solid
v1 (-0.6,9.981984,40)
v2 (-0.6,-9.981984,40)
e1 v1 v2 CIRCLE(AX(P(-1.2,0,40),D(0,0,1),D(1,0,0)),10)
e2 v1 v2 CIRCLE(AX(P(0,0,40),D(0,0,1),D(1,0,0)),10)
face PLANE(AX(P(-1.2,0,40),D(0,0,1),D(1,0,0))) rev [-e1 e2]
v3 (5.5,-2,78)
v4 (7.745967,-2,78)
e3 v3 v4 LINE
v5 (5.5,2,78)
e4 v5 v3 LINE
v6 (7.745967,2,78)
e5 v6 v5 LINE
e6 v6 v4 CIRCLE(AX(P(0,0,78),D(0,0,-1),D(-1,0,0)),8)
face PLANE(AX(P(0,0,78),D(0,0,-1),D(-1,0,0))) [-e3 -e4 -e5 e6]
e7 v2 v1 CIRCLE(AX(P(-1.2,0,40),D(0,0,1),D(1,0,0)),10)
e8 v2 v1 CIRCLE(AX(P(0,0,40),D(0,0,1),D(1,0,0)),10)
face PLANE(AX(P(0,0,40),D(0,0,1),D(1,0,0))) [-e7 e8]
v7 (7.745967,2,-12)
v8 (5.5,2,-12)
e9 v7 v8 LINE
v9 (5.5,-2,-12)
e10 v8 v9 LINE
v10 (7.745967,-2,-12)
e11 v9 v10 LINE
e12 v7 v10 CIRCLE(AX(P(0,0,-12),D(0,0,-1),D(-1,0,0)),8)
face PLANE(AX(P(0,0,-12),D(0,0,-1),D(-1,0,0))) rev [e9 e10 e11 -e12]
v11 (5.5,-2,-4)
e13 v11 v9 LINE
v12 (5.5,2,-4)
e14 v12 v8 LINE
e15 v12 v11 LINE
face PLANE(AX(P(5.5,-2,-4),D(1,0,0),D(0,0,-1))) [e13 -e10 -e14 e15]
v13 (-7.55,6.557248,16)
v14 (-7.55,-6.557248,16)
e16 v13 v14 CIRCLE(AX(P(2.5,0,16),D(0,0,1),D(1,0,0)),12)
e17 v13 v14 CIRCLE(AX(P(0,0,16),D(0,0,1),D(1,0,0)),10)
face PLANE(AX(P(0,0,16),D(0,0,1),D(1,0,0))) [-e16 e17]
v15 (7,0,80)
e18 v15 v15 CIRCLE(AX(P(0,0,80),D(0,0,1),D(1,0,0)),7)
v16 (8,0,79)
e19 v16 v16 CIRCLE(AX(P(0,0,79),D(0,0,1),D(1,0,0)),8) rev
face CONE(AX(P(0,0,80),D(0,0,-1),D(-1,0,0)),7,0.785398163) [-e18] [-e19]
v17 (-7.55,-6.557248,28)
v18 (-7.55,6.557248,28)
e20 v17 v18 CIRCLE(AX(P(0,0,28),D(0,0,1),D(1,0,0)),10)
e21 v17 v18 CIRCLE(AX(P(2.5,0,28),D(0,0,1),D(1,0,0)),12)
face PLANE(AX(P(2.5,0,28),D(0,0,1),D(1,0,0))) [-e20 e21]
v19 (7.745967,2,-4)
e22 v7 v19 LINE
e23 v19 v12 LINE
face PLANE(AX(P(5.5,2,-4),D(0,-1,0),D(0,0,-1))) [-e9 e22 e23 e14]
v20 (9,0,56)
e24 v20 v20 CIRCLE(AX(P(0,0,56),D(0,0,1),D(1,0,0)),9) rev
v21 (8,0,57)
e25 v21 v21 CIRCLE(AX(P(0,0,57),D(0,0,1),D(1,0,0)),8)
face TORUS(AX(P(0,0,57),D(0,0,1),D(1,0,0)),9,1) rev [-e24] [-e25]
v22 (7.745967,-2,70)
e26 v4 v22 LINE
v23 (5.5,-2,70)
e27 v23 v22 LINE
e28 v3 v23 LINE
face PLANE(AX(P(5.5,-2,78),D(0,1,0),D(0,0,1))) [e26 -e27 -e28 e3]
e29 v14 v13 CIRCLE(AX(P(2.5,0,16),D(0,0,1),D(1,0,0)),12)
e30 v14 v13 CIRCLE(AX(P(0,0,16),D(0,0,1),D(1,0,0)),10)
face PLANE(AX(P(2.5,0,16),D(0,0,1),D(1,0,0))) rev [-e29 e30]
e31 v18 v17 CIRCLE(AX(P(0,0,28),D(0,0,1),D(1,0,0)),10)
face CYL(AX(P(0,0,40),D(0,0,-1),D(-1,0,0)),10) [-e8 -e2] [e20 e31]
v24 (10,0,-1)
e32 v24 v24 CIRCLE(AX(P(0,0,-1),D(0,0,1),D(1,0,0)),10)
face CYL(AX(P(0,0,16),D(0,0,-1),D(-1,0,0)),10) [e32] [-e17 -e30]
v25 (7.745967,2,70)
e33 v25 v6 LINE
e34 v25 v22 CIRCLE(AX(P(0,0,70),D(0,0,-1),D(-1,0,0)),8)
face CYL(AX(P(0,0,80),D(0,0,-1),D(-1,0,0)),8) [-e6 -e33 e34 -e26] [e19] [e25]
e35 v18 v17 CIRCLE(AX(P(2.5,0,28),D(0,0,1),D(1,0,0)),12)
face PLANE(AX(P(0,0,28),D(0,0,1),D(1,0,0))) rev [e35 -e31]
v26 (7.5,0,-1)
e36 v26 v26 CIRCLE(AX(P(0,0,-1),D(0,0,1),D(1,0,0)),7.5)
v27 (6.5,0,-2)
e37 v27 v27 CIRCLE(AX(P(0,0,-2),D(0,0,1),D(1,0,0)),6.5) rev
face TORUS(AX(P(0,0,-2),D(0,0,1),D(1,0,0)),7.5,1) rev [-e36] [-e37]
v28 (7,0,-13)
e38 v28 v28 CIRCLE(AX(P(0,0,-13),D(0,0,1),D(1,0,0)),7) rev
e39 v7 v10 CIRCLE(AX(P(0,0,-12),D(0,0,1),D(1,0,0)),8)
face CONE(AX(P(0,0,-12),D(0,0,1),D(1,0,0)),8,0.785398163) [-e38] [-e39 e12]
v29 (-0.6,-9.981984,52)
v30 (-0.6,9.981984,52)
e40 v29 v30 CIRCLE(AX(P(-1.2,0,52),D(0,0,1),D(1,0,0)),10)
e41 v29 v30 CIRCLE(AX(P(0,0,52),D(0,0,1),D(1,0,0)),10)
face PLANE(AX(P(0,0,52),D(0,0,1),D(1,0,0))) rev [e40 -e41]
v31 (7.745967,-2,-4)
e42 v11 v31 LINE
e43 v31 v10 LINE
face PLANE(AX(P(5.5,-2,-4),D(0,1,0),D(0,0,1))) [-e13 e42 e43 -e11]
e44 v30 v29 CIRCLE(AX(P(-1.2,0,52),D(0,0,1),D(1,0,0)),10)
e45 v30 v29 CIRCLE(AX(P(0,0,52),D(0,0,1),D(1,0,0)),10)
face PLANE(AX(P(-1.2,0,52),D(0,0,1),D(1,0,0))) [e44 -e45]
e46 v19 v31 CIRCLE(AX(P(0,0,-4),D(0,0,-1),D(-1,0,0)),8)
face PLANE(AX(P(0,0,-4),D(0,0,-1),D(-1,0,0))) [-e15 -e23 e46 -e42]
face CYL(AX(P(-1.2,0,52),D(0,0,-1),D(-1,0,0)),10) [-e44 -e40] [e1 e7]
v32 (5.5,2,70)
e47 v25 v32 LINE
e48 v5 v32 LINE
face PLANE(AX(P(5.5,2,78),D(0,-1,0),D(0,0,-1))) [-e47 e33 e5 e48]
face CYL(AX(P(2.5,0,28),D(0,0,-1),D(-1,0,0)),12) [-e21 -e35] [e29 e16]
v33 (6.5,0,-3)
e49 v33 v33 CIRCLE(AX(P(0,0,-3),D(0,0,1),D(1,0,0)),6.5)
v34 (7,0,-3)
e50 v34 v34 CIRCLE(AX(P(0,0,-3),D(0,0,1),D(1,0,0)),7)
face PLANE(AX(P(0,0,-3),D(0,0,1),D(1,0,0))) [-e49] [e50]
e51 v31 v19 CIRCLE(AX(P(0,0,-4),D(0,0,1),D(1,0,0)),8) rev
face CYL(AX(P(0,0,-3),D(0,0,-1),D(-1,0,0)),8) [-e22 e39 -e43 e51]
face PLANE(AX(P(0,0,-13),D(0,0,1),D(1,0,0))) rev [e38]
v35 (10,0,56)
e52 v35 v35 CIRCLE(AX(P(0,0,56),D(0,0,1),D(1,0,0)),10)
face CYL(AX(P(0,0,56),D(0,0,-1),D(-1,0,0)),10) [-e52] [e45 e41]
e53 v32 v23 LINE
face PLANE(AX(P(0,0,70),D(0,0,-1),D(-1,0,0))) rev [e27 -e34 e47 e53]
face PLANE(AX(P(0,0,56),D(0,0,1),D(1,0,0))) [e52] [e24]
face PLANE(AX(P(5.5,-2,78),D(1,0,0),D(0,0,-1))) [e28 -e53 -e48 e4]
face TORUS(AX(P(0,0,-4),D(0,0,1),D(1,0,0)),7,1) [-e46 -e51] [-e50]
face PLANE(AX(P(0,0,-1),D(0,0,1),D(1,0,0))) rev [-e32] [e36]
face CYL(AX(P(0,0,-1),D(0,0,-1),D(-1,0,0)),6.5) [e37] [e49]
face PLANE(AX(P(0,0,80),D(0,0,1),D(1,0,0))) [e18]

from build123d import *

# Parameters (mm, degrees)
SKETCH_1_R          = 8
EXTRUDE_1_DEPTH     = 10
SKETCH_2_R          = 6.5
EXTRUDE_2_DEPTH     = 2
SKETCH_3_R          = 10
EXTRUDE_3_DEPTH     = 17
SKETCH_4_R          = 12
EXTRUDE_4_DEPTH     = 12
SKETCH_5_R          = 10
EXTRUDE_5_DEPTH     = 12
SKETCH_6_R          = 10
EXTRUDE_6_DEPTH     = 12
SKETCH_7_R          = 10
EXTRUDE_7_DEPTH     = 4
SKETCH_8_R          = 8
EXTRUDE_8_DEPTH     = 24
SKETCH_9_W          = 5.5
SKETCH_9_H          = 4
CUT_EXTRUDE_1_DEPTH = 8
SKETCH_10_W         = 5.5
SKETCH_10_H         = 4
CUT_EXTRUDE_2_DEPTH = 8
CHAMFER_1_SIZE      = 1
FILLET_1_R          = 1


with BuildPart() as part:
    # 草图1 → 凸台-拉伸1 (new body)
    with BuildSketch(Plane.XY.offset(-13)):
        Circle(SKETCH_1_R)
    extrude(amount=EXTRUDE_1_DEPTH)

    # 草图2 → 凸台-拉伸2 (add)
    with BuildSketch(Plane.XY.offset(-3)):
        Circle(SKETCH_2_R)
    extrude(amount=EXTRUDE_2_DEPTH)

    # 草图3 → 凸台-拉伸3 (add)
    with BuildSketch(Plane.XY.offset(-1)):
        Circle(SKETCH_3_R)
    extrude(amount=EXTRUDE_3_DEPTH)

    # 草图4 → 凸台-拉伸4 (add)
    with BuildSketch(Plane.XY.offset(16)):
        with Locations(Location((2.5, 0, 0), (0, 0, 213.122940208))):
            Circle(SKETCH_4_R)
    extrude(amount=EXTRUDE_4_DEPTH)

    # 草图5 → 凸台-拉伸5 (add)
    with BuildSketch(Plane.XY.offset(28)):
        with Locations(Location((0, 0, 0), (0, 0, 139.025369771))):
            Circle(SKETCH_5_R)
    extrude(amount=EXTRUDE_5_DEPTH)

    # 草图6 → 凸台-拉伸6 (add)
    with BuildSketch(Plane.XY.offset(40)):
        with Locations(Location((-1.2, 0, 0), (0, 0, 273.439812768))):
            Circle(SKETCH_6_R)
    extrude(amount=EXTRUDE_6_DEPTH)

    # 草图7 → 凸台-拉伸7 (add)
    with BuildSketch(Plane.XY.offset(52)):
        with Locations(Location((0, 0, 0), (0, 0, 139.025369771))):
            Circle(SKETCH_7_R)
    extrude(amount=EXTRUDE_7_DEPTH)

    # 草图8 → 凸台-拉伸8 (add)
    with BuildSketch(Plane.XY.offset(56)):
        Circle(SKETCH_8_R)
    extrude(amount=EXTRUDE_8_DEPTH)

    # 草图9 → 切除-拉伸1 (cut)
    with BuildSketch(Plane.XY.offset(-12)):
        with Locations((8.25, 0)):
            Rectangle(SKETCH_9_W, SKETCH_9_H)
    extrude(amount=CUT_EXTRUDE_1_DEPTH, mode=Mode.SUBTRACT)

    # 草图10 → 切除-拉伸2 (cut)
    with BuildSketch(Plane.XY.offset(70)):
        with Locations((8.25, 0)):
            Rectangle(SKETCH_10_W, SKETCH_10_H)
    extrude(amount=CUT_EXTRUDE_2_DEPTH, mode=Mode.SUBTRACT)

    # 倒角1
    chamfer_1_edges = [part.edges().sort_by_distance(p)[0] for p in [
        (-8, 0, -13),
        (-8, 0, 80),
    ]]
    chamfer(chamfer_1_edges, length=CHAMFER_1_SIZE - 0.0001)  # a hair under: the kernel refuses the full size

    # 圆角1
    fillet_1_edges = [part.edges().sort_by_distance(p)[0] for p in [
        (-8, 0, 56),
        (-8, 0, -3),
        (-6.5, 0, -1),
    ]]
    fillet(fillet_1_edges, radius=FILLET_1_R - 0.0001)  # a hair under: the kernel refuses the full size


solid = part.part
